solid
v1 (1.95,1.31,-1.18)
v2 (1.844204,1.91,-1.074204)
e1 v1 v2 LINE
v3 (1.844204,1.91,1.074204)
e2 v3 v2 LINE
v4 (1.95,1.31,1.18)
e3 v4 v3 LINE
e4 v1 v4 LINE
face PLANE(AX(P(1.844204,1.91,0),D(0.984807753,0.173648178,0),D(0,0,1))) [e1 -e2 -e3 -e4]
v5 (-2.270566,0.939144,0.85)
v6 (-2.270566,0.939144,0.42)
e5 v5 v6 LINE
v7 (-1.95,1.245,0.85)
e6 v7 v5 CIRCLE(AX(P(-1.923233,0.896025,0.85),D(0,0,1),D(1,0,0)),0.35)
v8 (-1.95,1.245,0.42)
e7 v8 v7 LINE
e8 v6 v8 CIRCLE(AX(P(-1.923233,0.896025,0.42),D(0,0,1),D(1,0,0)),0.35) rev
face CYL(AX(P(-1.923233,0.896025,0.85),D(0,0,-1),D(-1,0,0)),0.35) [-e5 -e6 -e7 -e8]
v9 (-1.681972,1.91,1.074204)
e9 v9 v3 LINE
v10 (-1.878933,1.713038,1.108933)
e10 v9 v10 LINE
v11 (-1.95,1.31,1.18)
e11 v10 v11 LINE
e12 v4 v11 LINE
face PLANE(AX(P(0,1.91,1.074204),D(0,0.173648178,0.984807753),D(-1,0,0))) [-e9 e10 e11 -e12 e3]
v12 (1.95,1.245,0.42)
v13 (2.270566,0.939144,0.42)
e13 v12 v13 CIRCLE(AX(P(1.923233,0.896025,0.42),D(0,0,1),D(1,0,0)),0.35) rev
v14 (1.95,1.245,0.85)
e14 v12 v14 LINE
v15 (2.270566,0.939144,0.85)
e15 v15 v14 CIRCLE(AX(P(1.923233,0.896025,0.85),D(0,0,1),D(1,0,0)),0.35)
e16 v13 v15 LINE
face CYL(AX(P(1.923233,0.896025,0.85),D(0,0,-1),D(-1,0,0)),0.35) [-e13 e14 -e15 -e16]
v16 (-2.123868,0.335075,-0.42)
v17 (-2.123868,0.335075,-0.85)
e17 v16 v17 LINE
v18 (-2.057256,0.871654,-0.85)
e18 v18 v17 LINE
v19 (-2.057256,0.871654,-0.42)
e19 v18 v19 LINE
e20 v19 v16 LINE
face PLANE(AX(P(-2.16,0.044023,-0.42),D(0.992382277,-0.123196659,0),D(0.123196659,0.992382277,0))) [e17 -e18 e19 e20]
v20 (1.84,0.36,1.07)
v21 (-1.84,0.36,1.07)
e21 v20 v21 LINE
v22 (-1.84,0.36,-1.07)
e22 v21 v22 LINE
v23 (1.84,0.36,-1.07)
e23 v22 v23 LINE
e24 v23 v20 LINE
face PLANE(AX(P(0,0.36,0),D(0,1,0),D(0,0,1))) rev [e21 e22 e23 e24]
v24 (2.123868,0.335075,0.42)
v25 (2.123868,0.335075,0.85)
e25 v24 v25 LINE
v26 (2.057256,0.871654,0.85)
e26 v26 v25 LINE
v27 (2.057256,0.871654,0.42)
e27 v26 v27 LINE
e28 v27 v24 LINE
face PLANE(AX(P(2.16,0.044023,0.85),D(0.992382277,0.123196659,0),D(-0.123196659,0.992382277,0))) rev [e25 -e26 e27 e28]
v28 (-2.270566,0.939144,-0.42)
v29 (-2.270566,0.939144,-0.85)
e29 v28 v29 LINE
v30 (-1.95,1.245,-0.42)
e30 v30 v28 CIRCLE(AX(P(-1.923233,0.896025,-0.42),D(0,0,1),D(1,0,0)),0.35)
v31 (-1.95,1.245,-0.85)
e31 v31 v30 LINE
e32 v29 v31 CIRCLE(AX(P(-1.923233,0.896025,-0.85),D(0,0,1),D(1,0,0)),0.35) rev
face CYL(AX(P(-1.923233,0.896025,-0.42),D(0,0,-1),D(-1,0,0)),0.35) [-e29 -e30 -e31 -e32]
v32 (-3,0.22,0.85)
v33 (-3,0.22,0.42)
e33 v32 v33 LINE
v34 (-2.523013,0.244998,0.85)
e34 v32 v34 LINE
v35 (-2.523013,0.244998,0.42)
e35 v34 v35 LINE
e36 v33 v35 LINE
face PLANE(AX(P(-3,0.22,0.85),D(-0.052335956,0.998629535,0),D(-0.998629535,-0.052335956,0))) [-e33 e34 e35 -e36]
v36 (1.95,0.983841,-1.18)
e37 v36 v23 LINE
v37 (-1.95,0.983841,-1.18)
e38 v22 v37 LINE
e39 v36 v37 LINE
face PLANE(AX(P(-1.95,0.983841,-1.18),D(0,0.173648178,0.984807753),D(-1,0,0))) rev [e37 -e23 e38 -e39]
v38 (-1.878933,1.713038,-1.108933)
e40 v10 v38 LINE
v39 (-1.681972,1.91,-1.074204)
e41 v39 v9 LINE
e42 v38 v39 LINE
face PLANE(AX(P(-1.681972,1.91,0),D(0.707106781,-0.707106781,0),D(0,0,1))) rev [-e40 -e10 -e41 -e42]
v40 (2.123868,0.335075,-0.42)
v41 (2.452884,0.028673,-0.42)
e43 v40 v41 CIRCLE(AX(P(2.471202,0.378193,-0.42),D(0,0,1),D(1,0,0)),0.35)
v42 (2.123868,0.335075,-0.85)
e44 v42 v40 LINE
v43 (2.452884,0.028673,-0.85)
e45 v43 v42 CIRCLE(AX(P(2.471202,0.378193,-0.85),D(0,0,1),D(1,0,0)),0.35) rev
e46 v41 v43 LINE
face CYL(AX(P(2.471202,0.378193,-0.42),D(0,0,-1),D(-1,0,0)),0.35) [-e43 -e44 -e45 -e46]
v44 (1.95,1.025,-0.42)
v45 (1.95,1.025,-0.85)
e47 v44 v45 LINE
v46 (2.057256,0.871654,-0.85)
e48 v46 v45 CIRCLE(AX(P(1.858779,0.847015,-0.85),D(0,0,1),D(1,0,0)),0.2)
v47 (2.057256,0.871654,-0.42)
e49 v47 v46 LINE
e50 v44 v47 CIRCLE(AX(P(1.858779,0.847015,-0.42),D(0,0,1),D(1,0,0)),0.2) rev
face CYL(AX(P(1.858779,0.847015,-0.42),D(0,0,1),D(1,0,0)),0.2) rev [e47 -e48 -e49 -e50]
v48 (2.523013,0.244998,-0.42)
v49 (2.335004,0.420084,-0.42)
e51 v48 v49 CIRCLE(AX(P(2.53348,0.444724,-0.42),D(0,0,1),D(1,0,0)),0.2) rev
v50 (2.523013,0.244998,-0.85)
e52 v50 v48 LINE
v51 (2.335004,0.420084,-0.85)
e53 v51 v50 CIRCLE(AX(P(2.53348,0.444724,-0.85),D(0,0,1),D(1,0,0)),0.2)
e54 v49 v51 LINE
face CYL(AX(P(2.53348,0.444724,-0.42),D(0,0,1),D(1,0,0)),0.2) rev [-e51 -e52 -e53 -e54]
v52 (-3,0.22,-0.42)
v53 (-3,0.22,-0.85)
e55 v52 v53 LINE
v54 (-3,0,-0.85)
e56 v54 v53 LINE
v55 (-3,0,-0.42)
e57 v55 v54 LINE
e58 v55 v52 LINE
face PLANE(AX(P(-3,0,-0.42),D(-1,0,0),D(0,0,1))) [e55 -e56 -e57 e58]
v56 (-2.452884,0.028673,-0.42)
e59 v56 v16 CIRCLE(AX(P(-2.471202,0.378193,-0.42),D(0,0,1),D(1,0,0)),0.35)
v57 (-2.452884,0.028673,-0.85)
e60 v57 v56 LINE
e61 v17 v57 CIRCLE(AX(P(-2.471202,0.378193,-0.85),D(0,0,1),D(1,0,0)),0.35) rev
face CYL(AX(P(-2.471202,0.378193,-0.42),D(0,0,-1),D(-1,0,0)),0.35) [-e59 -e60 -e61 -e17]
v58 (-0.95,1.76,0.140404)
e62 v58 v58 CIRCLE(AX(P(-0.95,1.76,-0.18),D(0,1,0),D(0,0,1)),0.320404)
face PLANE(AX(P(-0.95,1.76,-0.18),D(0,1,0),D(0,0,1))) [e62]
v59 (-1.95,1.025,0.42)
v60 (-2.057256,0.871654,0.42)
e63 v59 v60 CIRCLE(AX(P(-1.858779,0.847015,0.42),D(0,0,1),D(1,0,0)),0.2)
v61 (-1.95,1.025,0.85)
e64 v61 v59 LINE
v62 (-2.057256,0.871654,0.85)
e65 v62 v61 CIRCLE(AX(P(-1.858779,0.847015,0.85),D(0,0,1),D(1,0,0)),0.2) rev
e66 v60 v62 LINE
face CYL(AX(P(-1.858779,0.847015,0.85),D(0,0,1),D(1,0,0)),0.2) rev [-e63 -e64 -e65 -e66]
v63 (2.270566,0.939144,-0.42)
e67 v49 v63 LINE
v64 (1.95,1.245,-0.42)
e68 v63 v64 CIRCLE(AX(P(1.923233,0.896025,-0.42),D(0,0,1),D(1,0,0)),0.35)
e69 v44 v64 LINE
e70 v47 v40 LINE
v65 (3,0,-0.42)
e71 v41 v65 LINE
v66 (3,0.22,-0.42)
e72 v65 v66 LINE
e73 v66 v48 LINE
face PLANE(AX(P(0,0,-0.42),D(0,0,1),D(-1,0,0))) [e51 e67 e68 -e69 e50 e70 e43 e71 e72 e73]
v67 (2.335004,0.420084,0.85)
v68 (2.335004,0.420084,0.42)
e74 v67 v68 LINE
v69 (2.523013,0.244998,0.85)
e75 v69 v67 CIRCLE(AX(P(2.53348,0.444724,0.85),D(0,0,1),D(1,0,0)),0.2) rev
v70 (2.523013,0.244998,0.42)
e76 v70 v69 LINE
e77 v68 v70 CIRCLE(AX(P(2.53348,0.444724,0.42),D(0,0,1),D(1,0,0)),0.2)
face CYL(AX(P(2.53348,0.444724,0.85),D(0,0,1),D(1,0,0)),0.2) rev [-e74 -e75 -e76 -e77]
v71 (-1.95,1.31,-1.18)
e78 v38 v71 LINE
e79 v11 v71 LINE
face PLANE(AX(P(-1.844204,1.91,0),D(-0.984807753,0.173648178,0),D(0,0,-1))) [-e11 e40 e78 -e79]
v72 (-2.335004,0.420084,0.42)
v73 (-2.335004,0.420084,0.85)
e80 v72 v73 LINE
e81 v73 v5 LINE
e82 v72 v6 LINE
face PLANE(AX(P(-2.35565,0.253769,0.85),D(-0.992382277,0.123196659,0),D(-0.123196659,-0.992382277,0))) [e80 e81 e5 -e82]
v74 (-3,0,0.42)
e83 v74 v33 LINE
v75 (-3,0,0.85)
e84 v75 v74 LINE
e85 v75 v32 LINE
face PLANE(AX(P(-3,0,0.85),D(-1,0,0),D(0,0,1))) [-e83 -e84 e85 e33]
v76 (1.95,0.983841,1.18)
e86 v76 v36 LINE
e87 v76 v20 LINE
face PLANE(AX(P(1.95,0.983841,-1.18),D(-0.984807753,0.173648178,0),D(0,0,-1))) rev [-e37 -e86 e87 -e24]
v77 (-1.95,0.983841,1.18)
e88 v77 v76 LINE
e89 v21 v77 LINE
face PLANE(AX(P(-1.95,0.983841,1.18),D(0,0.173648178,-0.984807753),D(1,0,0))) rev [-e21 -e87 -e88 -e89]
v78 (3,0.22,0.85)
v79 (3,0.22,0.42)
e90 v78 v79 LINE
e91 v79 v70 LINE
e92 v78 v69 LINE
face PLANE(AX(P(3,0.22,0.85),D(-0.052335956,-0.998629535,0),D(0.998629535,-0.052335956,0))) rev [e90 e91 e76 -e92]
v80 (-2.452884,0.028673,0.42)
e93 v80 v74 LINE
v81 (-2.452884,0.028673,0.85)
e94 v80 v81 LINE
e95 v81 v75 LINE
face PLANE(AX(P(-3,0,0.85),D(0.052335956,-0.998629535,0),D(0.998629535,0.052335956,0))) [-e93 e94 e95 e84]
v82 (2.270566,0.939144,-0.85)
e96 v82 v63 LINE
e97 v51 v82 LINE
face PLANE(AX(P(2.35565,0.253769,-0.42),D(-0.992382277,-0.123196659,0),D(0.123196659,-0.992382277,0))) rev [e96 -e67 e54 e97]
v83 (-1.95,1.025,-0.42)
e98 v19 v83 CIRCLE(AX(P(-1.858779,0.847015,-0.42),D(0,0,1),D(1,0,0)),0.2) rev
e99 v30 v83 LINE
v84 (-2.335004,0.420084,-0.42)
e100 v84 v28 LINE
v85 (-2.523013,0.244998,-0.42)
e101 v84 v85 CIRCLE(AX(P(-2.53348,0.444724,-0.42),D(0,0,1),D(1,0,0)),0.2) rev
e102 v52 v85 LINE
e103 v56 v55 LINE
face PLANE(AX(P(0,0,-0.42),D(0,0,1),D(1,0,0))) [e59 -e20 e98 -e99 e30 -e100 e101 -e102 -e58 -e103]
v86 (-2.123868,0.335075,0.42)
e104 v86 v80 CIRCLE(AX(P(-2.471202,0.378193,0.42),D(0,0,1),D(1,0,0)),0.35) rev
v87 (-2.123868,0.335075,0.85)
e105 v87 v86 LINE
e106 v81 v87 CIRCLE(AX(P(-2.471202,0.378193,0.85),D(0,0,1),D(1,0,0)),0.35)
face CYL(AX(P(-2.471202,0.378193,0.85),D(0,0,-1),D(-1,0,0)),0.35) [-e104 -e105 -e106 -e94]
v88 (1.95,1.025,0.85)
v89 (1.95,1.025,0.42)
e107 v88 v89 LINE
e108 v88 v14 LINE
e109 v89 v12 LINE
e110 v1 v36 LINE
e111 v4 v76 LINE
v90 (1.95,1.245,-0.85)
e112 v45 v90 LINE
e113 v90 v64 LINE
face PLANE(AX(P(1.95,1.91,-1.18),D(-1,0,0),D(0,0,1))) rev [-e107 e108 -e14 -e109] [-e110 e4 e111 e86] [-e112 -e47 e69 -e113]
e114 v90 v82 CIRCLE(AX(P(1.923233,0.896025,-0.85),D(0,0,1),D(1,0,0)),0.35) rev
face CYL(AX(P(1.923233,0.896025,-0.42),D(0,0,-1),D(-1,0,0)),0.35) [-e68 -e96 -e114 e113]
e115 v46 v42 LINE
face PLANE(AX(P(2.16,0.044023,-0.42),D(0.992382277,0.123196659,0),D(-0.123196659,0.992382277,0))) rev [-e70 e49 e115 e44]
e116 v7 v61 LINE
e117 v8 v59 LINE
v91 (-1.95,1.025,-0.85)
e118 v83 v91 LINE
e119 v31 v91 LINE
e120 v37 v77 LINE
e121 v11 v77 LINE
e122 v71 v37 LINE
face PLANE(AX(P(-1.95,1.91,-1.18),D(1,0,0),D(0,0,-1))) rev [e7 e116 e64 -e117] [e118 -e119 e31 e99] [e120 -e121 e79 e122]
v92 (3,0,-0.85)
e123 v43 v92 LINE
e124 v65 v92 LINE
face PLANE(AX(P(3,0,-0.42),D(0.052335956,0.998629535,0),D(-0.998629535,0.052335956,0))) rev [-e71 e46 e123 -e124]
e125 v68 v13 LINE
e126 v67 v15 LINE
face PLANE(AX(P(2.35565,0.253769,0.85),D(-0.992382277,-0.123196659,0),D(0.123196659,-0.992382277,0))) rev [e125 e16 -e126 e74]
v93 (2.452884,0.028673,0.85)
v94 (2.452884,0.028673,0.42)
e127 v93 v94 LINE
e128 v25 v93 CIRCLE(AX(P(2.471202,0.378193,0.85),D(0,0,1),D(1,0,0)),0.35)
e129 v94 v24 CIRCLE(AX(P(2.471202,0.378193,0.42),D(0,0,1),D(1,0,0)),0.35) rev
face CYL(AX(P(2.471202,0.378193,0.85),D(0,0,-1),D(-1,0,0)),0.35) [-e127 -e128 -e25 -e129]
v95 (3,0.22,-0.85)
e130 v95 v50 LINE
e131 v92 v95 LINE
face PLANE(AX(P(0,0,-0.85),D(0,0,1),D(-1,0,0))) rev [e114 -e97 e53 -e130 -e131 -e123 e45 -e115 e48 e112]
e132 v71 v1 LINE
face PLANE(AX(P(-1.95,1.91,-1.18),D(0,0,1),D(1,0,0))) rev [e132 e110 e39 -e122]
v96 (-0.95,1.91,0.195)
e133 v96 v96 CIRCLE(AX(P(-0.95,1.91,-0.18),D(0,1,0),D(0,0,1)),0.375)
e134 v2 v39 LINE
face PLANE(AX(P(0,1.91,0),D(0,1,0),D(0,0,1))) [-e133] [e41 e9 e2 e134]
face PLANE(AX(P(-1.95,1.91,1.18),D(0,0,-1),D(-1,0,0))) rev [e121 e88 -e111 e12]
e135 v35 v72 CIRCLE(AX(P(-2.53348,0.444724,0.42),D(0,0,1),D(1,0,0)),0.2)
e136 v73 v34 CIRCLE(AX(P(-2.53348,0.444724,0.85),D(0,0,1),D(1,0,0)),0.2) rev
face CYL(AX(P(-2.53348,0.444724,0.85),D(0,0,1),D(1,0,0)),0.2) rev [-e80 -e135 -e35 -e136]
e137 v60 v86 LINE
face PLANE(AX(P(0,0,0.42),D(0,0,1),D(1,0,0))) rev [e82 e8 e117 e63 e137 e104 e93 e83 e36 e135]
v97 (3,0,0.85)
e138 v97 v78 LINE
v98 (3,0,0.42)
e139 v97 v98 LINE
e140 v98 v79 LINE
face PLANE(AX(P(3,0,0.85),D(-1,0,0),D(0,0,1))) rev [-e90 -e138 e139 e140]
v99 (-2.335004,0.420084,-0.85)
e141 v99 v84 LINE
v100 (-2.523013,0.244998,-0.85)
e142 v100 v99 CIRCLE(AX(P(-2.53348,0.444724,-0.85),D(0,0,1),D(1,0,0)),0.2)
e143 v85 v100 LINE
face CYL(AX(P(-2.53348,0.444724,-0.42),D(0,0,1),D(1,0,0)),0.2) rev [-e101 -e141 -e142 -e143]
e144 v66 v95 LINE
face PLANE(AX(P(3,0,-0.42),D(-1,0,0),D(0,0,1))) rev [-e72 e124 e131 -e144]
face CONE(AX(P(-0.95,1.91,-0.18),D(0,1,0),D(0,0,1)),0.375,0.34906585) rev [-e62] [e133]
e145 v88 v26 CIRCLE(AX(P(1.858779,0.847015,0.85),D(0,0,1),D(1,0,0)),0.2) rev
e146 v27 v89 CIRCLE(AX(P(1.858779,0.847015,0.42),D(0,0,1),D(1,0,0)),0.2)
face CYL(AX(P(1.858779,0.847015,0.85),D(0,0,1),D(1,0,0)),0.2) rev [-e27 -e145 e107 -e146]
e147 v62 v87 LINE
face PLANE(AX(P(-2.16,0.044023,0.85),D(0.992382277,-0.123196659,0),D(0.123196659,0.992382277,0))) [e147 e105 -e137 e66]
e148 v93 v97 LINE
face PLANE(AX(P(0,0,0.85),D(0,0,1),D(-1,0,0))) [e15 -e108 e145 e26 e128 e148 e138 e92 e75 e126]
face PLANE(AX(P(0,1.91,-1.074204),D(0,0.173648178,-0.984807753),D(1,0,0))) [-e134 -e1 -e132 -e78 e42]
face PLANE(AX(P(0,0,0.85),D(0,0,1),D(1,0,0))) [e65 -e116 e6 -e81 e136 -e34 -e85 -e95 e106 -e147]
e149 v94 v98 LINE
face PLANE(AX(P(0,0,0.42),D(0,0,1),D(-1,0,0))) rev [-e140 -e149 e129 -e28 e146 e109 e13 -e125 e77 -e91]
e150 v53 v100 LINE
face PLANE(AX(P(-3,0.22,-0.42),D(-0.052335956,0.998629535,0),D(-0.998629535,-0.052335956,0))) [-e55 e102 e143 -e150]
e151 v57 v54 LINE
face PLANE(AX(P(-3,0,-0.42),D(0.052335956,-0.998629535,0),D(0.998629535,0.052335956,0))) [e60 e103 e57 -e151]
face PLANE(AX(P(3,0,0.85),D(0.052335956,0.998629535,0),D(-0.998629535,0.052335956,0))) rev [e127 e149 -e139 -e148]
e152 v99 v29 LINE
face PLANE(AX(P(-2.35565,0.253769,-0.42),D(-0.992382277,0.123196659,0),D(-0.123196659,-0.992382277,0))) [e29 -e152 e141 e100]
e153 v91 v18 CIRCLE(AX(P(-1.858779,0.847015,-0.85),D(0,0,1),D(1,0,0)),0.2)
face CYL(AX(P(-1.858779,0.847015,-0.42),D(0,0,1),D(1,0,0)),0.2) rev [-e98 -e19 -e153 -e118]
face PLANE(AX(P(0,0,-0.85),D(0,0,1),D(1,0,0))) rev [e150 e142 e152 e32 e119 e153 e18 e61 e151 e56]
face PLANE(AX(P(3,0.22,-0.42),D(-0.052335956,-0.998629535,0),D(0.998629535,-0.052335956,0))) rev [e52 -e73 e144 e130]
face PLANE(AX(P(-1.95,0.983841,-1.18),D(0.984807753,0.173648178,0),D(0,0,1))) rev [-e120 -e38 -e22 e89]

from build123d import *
from OCP.BRepFilletAPI import BRepFilletAPI_MakeChamfer

# Parameters (mm, degrees)
SKETCH1_W            = 3.9
SKETCH1_H            = 2.36
BOSS_EXTRUDE1_DEPTH  = 1.55
CHAMFER1_SIZE        = 0.11
CHAMFER1_SIZE2       = 0.623841
CHAMFER2_SIZE        = 0.6
CHAMFER2_SIZE2       = 0.105796188
CHAMFER3_SIZE        = 0.2
CHAMFER3_SIZE2       = 0.162231915
SKETCH3_R            = 0.375
MARK_PIN1_DEPTH      = 0.15
MARK_PIN1_DRAFT      = -20
PIN_EXTRUDE_DEPTH    = 0.43
FILLET1_R            = 0.2
FILLET2_R            = 0.35
FILLET1_OF_MIRROR1_R = 0.2
FILLET2_OF_MIRROR1_R = 0.35
PIN_PATTERN_START    = 0.42
PIN_PATTERN_DEPTH    = 0.43


# Read off the part's stored shape, not the designer's step: pin_pattern
with BuildPart() as part:
    # Sketch1 → Boss-Extrude1 (new body)
    with BuildSketch(Plane(origin=(0, 0.36, 0), x_dir=(1, 0, 0), z_dir=(0, 1, 0))):
        Rectangle(SKETCH1_W, SKETCH1_H)
    extrude(amount=BOSS_EXTRUDE1_DEPTH)

    # Chamfer1
    chamfer1_edges = [part.edges().sort_by_distance(p)[0] for p in [
        (0, 0.36, 1.18),
        (-1.95, 0.36, 0),
        (0, 0.36, -1.18),
        (1.95, 0.36, 0),
    ]]
    chamfer1_side = [part.faces().sort_by_distance(p)[0] for p in [
        (0, 0.36, 0),
    ]]
    chamfer(chamfer1_edges, length=CHAMFER1_SIZE, length2=CHAMFER1_SIZE2, reference=chamfer1_side[0])

    # Chamfer2: one chamfer whose edges measure the first distance from different faces: ONE call of the kernel's chamfer builder (chamfer() names one face for all edges)
    chamfer2_edges_1 = [part.edges().sort_by_distance(p)[0] for p in [
        (-1.95, 1.91, 0),
    ]]
    chamfer2_side_1 = [part.faces().sort_by_distance(p)[0] for p in [
        (-1.95, 1.4469205, 0),
    ]]
    chamfer2_edges_2 = [part.edges().sort_by_distance(p)[0] for p in [
        (0, 1.91, 1.18),
    ]]
    chamfer2_side_2 = [part.faces().sort_by_distance(p)[0] for p in [
        (0, 1.4469205, 1.18),
    ]]
    chamfer2_edges_3 = [part.edges().sort_by_distance(p)[0] for p in [
        (1.95, 1.91, 0),
    ]]
    chamfer2_side_3 = [part.faces().sort_by_distance(p)[0] for p in [
        (1.95, 1.4469205, 0),
    ]]
    chamfer2_edges_4 = [part.edges().sort_by_distance(p)[0] for p in [
        (0, 1.91, -1.18),
    ]]
    chamfer2_side_4 = [part.faces().sort_by_distance(p)[0] for p in [
        (0, 1.4469205, -1.18),
    ]]
    chamfer2 = BRepFilletAPI_MakeChamfer(part.part.solid().wrapped)
    for e in chamfer2_edges_1:
        chamfer2.Add(CHAMFER2_SIZE, CHAMFER2_SIZE2, e.wrapped, chamfer2_side_1[0].wrapped)  # the first distance lies on this face
    for e in chamfer2_edges_2:
        chamfer2.Add(CHAMFER2_SIZE, CHAMFER2_SIZE2, e.wrapped, chamfer2_side_2[0].wrapped)  # the first distance lies on this face
    for e in chamfer2_edges_3:
        chamfer2.Add(CHAMFER2_SIZE, CHAMFER2_SIZE2, e.wrapped, chamfer2_side_3[0].wrapped)  # the first distance lies on this face
    for e in chamfer2_edges_4:
        chamfer2.Add(CHAMFER2_SIZE, CHAMFER2_SIZE2, e.wrapped, chamfer2_side_4[0].wrapped)  # the first distance lies on this face
    add(Compound.cast(chamfer2.Shape()), mode=Mode.REPLACE)

    # Chamfer3
    chamfer3_edges = [part.edges().sort_by_distance(p)[0] for p in [
        (-1.844203812, 1.91, 0),
    ]]
    chamfer3_side = [part.faces().sort_by_distance(p)[0] for p in [
        (-1.897929458, 1.605306716, 0),
    ]]
    chamfer(chamfer3_edges, length=CHAMFER3_SIZE, length2=CHAMFER3_SIZE2, reference=chamfer3_side[0])


with BuildPart() as mark_pin1_tool:
    # Sketch3 → mark pin1 (with draft: the straight prism first)
    with BuildSketch(Plane(origin=(0, 1.91, 0), x_dir=(1, 0, 0), z_dir=(0, 1, 0))):
        with Locations((-0.95, 0.18)):
            Circle(SKETCH3_R)
    extrude(amount=-MARK_PIN1_DEPTH)
    # mark pin1: the draft: its side faces are tilted about the plane it starts from
    mark_pin1_sides = [mark_pin1_tool.faces().sort_by_distance(p)[0] for p in [
        (-1.325, 1.835, -0.18),
    ]]
    draft(mark_pin1_sides, Plane(origin=(0, 1.91, 0), x_dir=(1, 0, 0), z_dir=(0, 1, 0)), MARK_PIN1_DRAFT)


with BuildPart() as part_1:
    add(part.part)

    # mark pin1: cut by mark_pin1_tool
    add(mark_pin1_tool.part, mode=Mode.SUBTRACT)

    # Sketch2 → pin extrude (add)
    with BuildSketch(Plane(origin=(0, 0, -0.85), x_dir=(-1, 0, 0), z_dir=(0, 0, -1))):
        Polygon((3, 0), (3, 0.22), (2.355650355, 0.253768934), (2.232596609, 1.245), (0, 1.245), (0, 1.025), (2.038219161, 1.025), (2.16, 0.044022535), align=None)
    pin_extrude = extrude(amount=-PIN_EXTRUDE_DEPTH)

    # Fillet1
    # the kernel refuses this fillet: 0.2 mm, written as the material it adds along each edge
    with BuildSketch(Plane(origin=(-2.355650355, 0.253768934, -0.85), x_dir=(0.1231966593163618, 0.9923822767126025, 0), z_dir=(0, 0, 1))) as fillet1_piece_1:
        with BuildLine():
            CenterArc((FILLET1_R * 0.837960751352, FILLET1_R), FILLET1_R, 190.076627033, 79.923372967)
            Line((-FILLET1_R * 0.146613884969, FILLET1_R * 0.825034902013), (-FILLET1_R * 0.166305377696, FILLET1_R * 0.821535600054))
            Line((-FILLET1_R * 0.166305377696, FILLET1_R * 0.821535600054), (-FILLET1_R * 0.016759215027, -FILLET1_R * 0.02))
            Line((-FILLET1_R * 0.016759215027, -FILLET1_R * 0.02), (FILLET1_R * 0.837960751352, -FILLET1_R * 0.02))
            Line((FILLET1_R * 0.837960751352, -FILLET1_R * 0.02), (FILLET1_R * 0.837960751352, 0))
        make_face()
    extrude(amount=0.43)
    with BuildSketch(Plane(origin=(-2.038219161, 1.025, -0.85), x_dir=(1, 0, 0), z_dir=(0, 0, 1))) as fillet1_piece_2:
        with BuildLine():
            CenterArc((0.179439713, -0.177985423), FILLET1_R, 117.135910173, 55.787462794)
            Line((-0.019036743, -0.153346091), (-0.023006272, -0.152853305))
            Line((-0.023006272, -0.152853305), (-0.003969529, 0.000492787))
            Line((-0.003969529, 0.000492787), (0, 0.004))
            ThreePointArc((0, 0.004), (0.04410958, 0.004), (0.08639475, 0.003559708))
            Line((0.08639475, 0.003559708), (0.088219161, 0))
        make_face()
    extrude(amount=0.43)

    # Fillet2
    # the kernel refuses this fillet: 0.35 mm, written as the material it takes off along each edge
    with BuildSketch(Plane(origin=(-2.16, 0.044022535, -1.583215657), x_dir=(0.12319665931636148, 0.9923822767126025, 0), z_dir=(0, 0, 1))) as fillet2_piece_1:
        with BuildLine():
            CenterArc((FILLET2_R * 0.837960751352, FILLET2_R), FILLET2_R, 190.076627033, 79.923372967)
            Line((-FILLET2_R * 0.146613884969, FILLET2_R * 0.825034902013), (-FILLET2_R * 0.166305377696, FILLET2_R * 0.821535600054))
            Line((-FILLET2_R * 0.166305377696, FILLET2_R * 0.821535600054), (-FILLET2_R * 0.016759215027, -FILLET2_R * 0.02))
            Line((-FILLET2_R * 0.016759215027, -FILLET2_R * 0.02), (FILLET2_R * 0.837960751352, -FILLET2_R * 0.02))
            Line((FILLET2_R * 0.837960751352, -FILLET2_R * 0.02), (FILLET2_R * 0.837960751352, 0))
        make_face()
    extrude(amount=1.896431315, mode=Mode.SUBTRACT)
    with BuildSketch(Plane(origin=(-2.232596609, 1.245, -1.620509776), x_dir=(1, 0, 0), z_dir=(0, 0, 1))) as fillet2_piece_2:
        with BuildLine():
            CenterArc((0.309364105, -0.348974929), FILLET2_R, 94.386181504, 78.537191463)
            Line((-0.037969692, -0.305856098), (-0.044916368, -0.304993722))
            Line((-0.044916368, -0.304993722), (-0.006946676, 0.000862377))
            Line((-0.006946676, 0.000862377), (0, 0.007))
            ThreePointArc((0, 0.007), (0.141298305, 0.007), (0.282061259, 0.006979499))
            Line((0.282061259, 0.006979499), (0.282596609, 0))
        make_face()
    extrude(amount=1.971019553, mode=Mode.SUBTRACT)

    # Mirror1: pin extrude across plane
    add(pin_extrude.mirror(Plane(origin=(0, 0, 0), x_dir=(0, 0, 1), z_dir=(1, 0, 0))))

    # Fillet1 of Mirror1
    # the kernel refuses this fillet: 0.2 mm, written as the material it adds along each edge
    with BuildSketch(Plane(origin=(2.355650355, 0.253768934, -0.85), x_dir=(-0.1231966593163618, 0.9923822767126025, 0), z_dir=(0, 0, 1))) as fillet1_of_mirror1_piece_1:
        with BuildLine():
            CenterArc((FILLET1_OF_MIRROR1_R * 0.837960751352, -FILLET1_OF_MIRROR1_R), FILLET1_OF_MIRROR1_R, 90, 79.923372967)
            Line((-FILLET1_OF_MIRROR1_R * 0.146613884969, -FILLET1_OF_MIRROR1_R * 0.825034902013), (-FILLET1_OF_MIRROR1_R * 0.166305377696, -FILLET1_OF_MIRROR1_R * 0.821535600054))
            Line((-FILLET1_OF_MIRROR1_R * 0.166305377696, -FILLET1_OF_MIRROR1_R * 0.821535600054), (-FILLET1_OF_MIRROR1_R * 0.016759215027, FILLET1_OF_MIRROR1_R * 0.02))
            Line((-FILLET1_OF_MIRROR1_R * 0.016759215027, FILLET1_OF_MIRROR1_R * 0.02), (FILLET1_OF_MIRROR1_R * 0.837960751352, FILLET1_OF_MIRROR1_R * 0.02))
            Line((FILLET1_OF_MIRROR1_R * 0.837960751352, FILLET1_OF_MIRROR1_R * 0.02), (FILLET1_OF_MIRROR1_R * 0.837960751352, 0))
        make_face()
    extrude(amount=0.43)
    with BuildSketch(Plane(origin=(2.038219161, 1.025, -0.85), x_dir=(-1, 0, 0), z_dir=(0, 0, 1))) as fillet1_of_mirror1_piece_2:
        with BuildLine():
            CenterArc((0.179439713, 0.177985423), FILLET1_OF_MIRROR1_R, 187.076627033, 55.787462794)
            Line((-0.019036743, 0.153346091), (-0.023006272, 0.152853305))
            Line((-0.023006272, 0.152853305), (-0.003969529, -0.000492787))
            Line((-0.003969529, -0.000492787), (0, -0.004))
            ThreePointArc((0, -0.004), (0.04410958, -0.004), (0.08639475, -0.003559708))
            Line((0.08639475, -0.003559708), (0.088219161, 0))
        make_face()
    extrude(amount=0.43)

    # Fillet2 of Mirror1
    # the kernel refuses this fillet: 0.35 mm, written as the material it takes off along each edge
    with BuildSketch(Plane(origin=(2.16, 0.044022535, -1.583215657), x_dir=(-0.12319665931636148, 0.9923822767126025, 0), z_dir=(0, 0, 1))) as fillet2_of_mirror1_piece_1:
        with BuildLine():
            CenterArc((FILLET2_OF_MIRROR1_R * 0.837960751352, -FILLET2_OF_MIRROR1_R), FILLET2_OF_MIRROR1_R, 90, 79.923372967)
            Line((-FILLET2_OF_MIRROR1_R * 0.146613884969, -FILLET2_OF_MIRROR1_R * 0.825034902013), (-FILLET2_OF_MIRROR1_R * 0.166305377696, -FILLET2_OF_MIRROR1_R * 0.821535600054))
            Line((-FILLET2_OF_MIRROR1_R * 0.166305377696, -FILLET2_OF_MIRROR1_R * 0.821535600054), (-FILLET2_OF_MIRROR1_R * 0.016759215027, FILLET2_OF_MIRROR1_R * 0.02))
            Line((-FILLET2_OF_MIRROR1_R * 0.016759215027, FILLET2_OF_MIRROR1_R * 0.02), (FILLET2_OF_MIRROR1_R * 0.837960751352, FILLET2_OF_MIRROR1_R * 0.02))
            Line((FILLET2_OF_MIRROR1_R * 0.837960751352, FILLET2_OF_MIRROR1_R * 0.02), (FILLET2_OF_MIRROR1_R * 0.837960751352, 0))
        make_face()
    extrude(amount=1.896431315, mode=Mode.SUBTRACT)
    with BuildSketch(Plane(origin=(2.232596609, 1.245, -1.620509776), x_dir=(-1, 0, 0), z_dir=(0, 0, 1))) as fillet2_of_mirror1_piece_2:
        with BuildLine():
            CenterArc((0.309364105, 0.348974929), FILLET2_OF_MIRROR1_R, 187.076627033, 78.537191463)
            Line((-0.037969692, 0.305856098), (-0.044916368, 0.304993722))
            Line((-0.044916368, 0.304993722), (-0.006946676, -0.000862377))
            Line((-0.006946676, -0.000862377), (0, -0.007))
            ThreePointArc((0, -0.007), (0.141298305, -0.007), (0.282061259, -0.006979499))
            Line((0.282061259, -0.006979499), (0.282596609, 0))
        make_face()
    extrude(amount=1.971019553, mode=Mode.SUBTRACT)

    # pin_pattern outline → pin_pattern (add)
    with BuildSketch(Plane.XY.offset(PIN_PATTERN_START)):
        with BuildLine():
            Line((-3, 0.22), (-3, 0))
            Line((-3, 0), (-2.452884324, 0.028673118))
            ThreePointArc((-2.452884324, 0.028673118), (-2.232673705, 0.122060099), (-2.123868112, 0.335074624))
            Line((-2.123868112, 0.335074624), (-2.057255903, 0.871653909))
            ThreePointArc((-2.057255903, 0.871653909), (-2.022669182, 0.961645092), (-1.95, 1.025))
            Line((-1.95, 1.025), (-1.95, 1.245))
            ThreePointArc((-1.95, 1.245), (-2.164841553, 1.149254349), (-2.270566301, 0.939143902))
            Line((-2.270566301, 0.939143902), (-2.335003562, 0.420084414))
            ThreePointArc((-2.335003562, 0.420084414), (-2.397178186, 0.298361828), (-2.523012826, 0.244997839))
            Line((-2.523012826, 0.244997839), (-3, 0.22))
        make_face()
        with BuildLine():
            Line((2.452884324, 0.028673118), (3, 0))
            Line((3, 0), (3, 0.22))
            Line((3, 0.22), (2.523012826, 0.244997839))
            ThreePointArc((2.523012826, 0.244997839), (2.397178186, 0.298361828), (2.335003562, 0.420084414))
            Line((2.335003562, 0.420084414), (2.270566301, 0.939143902))
            ThreePointArc((2.270566301, 0.939143902), (2.164841553, 1.149254349), (1.95, 1.245))
            Line((1.95, 1.245), (1.95, 1.025))
            ThreePointArc((1.95, 1.025), (2.022669182, 0.961645092), (2.057255903, 0.871653909))
            Line((2.057255903, 0.871653909), (2.123868112, 0.335074624))
            ThreePointArc((2.123868112, 0.335074624), (2.232673705, 0.122060099), (2.452884324, 0.028673118))
        make_face()
    extrude(amount=PIN_PATTERN_DEPTH)


solid = part_1.part
